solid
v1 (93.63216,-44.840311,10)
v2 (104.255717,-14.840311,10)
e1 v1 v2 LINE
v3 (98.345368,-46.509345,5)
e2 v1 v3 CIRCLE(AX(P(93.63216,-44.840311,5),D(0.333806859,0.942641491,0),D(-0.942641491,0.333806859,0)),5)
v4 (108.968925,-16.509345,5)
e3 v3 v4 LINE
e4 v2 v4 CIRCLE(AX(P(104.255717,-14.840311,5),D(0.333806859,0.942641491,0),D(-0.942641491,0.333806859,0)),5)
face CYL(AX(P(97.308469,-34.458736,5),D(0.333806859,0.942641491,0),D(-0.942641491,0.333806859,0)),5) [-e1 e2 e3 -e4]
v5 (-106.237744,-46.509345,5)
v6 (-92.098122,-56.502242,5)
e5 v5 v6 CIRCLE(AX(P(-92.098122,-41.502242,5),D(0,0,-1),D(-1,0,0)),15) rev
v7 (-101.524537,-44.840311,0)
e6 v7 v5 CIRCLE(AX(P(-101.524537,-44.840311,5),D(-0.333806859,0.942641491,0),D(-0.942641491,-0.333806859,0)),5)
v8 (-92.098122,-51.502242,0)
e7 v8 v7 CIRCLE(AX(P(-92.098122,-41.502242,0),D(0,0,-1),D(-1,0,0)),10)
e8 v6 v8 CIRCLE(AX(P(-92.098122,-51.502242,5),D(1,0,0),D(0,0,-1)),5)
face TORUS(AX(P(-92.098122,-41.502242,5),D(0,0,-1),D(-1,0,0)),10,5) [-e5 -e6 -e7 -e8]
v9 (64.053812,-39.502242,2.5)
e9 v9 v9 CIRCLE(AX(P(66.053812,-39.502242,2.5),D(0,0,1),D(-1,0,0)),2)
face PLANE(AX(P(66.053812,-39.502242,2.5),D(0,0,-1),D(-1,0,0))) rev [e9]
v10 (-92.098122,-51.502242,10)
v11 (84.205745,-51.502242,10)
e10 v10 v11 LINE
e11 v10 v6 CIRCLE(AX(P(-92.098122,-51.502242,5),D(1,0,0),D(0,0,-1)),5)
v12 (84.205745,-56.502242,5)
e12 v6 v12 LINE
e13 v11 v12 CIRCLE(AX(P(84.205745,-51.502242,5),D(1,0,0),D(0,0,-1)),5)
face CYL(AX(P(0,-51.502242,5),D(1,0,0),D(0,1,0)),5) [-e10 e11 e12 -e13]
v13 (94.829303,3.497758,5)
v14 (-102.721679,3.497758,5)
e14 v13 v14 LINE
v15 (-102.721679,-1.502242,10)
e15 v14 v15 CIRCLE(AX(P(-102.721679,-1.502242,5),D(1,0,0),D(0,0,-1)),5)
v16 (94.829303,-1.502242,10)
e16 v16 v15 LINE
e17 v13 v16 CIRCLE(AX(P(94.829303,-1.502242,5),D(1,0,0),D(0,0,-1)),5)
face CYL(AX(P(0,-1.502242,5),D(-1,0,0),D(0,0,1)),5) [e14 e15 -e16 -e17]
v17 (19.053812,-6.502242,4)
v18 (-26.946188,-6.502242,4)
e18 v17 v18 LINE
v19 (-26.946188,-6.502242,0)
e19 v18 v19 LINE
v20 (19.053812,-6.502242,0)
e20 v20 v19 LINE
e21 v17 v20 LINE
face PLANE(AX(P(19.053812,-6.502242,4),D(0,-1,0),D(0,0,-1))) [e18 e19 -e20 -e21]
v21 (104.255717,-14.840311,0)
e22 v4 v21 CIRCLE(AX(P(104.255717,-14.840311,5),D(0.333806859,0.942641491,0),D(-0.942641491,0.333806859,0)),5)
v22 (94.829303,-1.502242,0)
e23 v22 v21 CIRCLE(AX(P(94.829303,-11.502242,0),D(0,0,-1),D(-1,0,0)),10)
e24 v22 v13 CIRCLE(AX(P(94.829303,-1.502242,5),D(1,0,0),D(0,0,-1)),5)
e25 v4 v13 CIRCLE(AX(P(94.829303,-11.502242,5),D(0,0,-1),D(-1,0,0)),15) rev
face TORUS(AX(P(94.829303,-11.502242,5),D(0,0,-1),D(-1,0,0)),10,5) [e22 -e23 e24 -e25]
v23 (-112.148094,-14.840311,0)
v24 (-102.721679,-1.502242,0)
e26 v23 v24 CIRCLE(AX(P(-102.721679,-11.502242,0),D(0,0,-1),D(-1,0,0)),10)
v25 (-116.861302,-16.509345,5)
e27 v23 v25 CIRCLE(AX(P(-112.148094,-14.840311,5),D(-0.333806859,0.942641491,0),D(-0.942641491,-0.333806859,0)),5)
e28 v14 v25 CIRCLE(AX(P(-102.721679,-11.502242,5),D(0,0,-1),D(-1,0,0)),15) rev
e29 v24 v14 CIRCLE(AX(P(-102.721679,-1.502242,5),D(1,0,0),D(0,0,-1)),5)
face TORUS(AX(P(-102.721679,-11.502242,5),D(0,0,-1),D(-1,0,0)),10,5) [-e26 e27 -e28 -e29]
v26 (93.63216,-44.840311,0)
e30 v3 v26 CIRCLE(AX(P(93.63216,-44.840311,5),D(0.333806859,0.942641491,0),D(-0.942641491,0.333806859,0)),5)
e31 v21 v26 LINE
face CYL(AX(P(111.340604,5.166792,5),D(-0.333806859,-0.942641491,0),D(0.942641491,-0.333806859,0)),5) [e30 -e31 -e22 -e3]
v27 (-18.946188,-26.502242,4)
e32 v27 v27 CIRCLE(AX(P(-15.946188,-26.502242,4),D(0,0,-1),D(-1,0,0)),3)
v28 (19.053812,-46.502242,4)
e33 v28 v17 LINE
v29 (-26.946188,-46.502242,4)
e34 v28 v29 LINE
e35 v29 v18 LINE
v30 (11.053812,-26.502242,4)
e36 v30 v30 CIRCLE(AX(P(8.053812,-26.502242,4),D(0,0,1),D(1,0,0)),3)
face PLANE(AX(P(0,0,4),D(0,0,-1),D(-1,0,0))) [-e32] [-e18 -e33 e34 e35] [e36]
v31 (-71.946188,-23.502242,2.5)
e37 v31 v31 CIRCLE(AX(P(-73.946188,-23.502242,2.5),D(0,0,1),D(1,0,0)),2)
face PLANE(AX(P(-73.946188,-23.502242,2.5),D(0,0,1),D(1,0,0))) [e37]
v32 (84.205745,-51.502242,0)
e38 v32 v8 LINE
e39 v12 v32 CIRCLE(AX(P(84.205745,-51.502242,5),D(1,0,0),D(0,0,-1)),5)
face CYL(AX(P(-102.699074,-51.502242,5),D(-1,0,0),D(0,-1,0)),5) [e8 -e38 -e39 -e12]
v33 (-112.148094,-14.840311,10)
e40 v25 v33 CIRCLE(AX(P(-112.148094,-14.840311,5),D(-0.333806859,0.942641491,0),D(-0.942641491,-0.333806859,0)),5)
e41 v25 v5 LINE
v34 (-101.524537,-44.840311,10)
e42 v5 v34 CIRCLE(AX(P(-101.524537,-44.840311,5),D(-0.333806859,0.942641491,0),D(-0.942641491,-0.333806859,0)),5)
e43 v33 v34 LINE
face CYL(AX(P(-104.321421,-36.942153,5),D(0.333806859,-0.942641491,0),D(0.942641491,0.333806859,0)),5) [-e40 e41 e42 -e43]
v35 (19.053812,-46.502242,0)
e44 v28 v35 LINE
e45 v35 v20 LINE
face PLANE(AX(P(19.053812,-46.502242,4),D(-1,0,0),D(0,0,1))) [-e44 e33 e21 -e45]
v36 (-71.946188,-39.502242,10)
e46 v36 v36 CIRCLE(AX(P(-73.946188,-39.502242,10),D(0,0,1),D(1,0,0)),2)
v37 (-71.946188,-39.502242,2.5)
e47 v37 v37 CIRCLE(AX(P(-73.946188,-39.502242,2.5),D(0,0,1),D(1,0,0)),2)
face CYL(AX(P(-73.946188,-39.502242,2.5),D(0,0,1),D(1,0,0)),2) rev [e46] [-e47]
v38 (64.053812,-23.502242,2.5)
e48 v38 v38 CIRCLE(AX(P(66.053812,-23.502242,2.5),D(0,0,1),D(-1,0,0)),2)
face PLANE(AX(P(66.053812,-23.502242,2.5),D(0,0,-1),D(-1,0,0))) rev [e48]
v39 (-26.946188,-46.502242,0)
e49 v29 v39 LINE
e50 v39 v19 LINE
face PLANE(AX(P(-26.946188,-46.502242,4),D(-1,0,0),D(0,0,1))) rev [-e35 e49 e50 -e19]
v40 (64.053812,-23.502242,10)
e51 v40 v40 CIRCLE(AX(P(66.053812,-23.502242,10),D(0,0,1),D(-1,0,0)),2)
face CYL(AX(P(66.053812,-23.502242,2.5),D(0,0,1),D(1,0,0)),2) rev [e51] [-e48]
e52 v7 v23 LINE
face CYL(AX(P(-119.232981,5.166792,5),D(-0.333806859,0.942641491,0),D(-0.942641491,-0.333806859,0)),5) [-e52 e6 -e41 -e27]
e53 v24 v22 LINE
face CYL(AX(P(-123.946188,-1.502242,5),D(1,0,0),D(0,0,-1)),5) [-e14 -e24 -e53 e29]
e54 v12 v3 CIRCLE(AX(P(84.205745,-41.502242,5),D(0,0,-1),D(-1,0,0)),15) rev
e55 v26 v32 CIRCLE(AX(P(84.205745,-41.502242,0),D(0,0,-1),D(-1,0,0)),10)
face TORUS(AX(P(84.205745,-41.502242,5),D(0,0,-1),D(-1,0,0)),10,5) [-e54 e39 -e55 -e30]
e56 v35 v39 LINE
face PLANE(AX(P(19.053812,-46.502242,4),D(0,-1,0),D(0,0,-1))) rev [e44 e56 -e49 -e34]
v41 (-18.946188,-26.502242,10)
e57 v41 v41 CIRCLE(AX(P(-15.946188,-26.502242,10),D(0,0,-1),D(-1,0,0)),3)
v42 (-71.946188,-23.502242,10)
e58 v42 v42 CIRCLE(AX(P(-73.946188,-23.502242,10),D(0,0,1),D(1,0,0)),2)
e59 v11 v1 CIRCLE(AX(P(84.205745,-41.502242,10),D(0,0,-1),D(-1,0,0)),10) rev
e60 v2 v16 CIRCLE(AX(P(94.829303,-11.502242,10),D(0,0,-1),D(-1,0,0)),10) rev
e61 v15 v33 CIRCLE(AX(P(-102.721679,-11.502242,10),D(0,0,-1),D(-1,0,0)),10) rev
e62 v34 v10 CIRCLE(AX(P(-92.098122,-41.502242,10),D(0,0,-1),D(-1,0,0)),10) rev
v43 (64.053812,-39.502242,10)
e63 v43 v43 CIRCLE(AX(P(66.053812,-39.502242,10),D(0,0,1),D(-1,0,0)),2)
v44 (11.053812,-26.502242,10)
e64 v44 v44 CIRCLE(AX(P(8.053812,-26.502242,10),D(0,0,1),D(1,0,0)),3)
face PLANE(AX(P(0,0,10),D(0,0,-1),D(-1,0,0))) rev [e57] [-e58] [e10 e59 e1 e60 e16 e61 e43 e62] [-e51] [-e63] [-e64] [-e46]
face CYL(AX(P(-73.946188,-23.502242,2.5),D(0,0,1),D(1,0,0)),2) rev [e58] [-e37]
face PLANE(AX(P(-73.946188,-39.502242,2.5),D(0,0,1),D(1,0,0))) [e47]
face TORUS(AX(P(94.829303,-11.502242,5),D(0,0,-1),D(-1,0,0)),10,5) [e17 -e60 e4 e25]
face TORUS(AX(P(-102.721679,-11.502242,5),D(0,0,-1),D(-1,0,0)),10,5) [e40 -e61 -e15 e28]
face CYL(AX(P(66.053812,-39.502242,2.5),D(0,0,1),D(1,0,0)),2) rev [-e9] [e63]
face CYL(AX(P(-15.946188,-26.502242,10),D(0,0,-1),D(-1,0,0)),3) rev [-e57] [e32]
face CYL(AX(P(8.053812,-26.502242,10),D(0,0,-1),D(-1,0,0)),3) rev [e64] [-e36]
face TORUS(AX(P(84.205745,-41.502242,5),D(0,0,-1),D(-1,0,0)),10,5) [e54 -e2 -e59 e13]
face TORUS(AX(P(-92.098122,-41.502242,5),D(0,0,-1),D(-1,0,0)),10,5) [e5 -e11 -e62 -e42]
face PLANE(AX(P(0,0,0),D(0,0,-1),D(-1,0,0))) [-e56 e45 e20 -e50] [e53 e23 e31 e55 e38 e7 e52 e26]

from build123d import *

# Parameters (mm, degrees)
EXTRUDE_1_DEPTH     = 10
FILLET_1_R          = 15
FILLET_2_R          = 5
SKETCH_2_R          = 2
CUT_EXTRUDE_1_DEPTH = 7.5
SKETCH_3_W          = 46
SKETCH_3_H          = 40
CUT_EXTRUDE_2_DEPTH = 4
SKETCH_8_R          = 3
CUT_EXTRUDE_3_DEPTH = 131.716858695


with BuildPart() as part:
    # 草圖1 → 填料-伸長1 (new body)
    with BuildSketch(Plane.XY):
        Polygon((-123.946188341, 3.497757848), (-102.699073989, -56.502242152), (94.806697307, -56.502242152), (116.053811659, 3.497757848), align=None)
    extrude(amount=EXTRUDE_1_DEPTH)

    # 圓角1
    fillet_1_edges = [part.edges().sort_by_distance(p)[0] for p in [
        (116.053811659, 3.497757848, 5),
        (94.806697307, -56.502242152, 5),
        (-102.699073989, -56.502242152, 5),
        (-123.946188341, 3.497757848, 5),
    ]]
    fillet(fillet_1_edges, radius=FILLET_1_R)

    # 圓角2
    fillet_2_edges = [part.edges().sort_by_distance(p)[0] for p in [
        (107.078925905, -2.845064302, 10),
        (103.657146356, -31.509345041, 10),
        (92.862923252, -53.75186548, 10),
        (-3.946188341, -56.502242152, 10),
        (-100.755299934, -53.75186548, 10),
        (-111.549523037, -31.509345041, 10),
        (-114.971302586, -2.845064302, 10),
        (-3.946188341, 3.497757848, 10),
        (-114.971302586, -2.845064302, 0),
        (-111.549523037, -31.509345041, 0),
        (-100.755299934, -53.75186548, 0),
        (-3.946188341, -56.502242152, 0),
        (92.862923252, -53.75186548, 0),
        (103.657146356, -31.509345041, 0),
        (107.078925905, -2.845064302, 0),
        (-3.946188341, 3.497757848, 0),
    ]]
    fillet(fillet_2_edges, radius=FILLET_2_R - 0.0001)  # a hair under: the kernel refuses the full size

    # 草圖2 → 除料-伸長1 (cut)
    with BuildSketch(Plane.XY.offset(10)):
        with Locations((-73.946188341, -23.502242152)):
            Circle(SKETCH_2_R)
        with Locations((-73.946188341, -39.502242152)):
            Circle(SKETCH_2_R)
        with Locations(Location((66.053811659, -39.502242152, 0), (0, 0, 180))):
            Circle(SKETCH_2_R)
        with Locations(Location((66.053811659, -23.502242152, 0), (0, 0, 180))):
            Circle(SKETCH_2_R)
    extrude(amount=-CUT_EXTRUDE_1_DEPTH, mode=Mode.SUBTRACT)

    # 草圖3 → 除料-伸長2 (cut)
    with BuildSketch(Plane(origin=(0, 0, 0), x_dir=(-1, 0, 0), z_dir=(0, 0, -1))):
        with Locations((3.946188341, -26.502242152)):
            Rectangle(SKETCH_3_W, SKETCH_3_H)
    extrude(amount=-CUT_EXTRUDE_2_DEPTH, mode=Mode.SUBTRACT)

    # 草圖8 → 除料-伸長3 (cut, through all)
    with BuildSketch(Plane(origin=(0, 0, 4), x_dir=(-1, 0, 0), z_dir=(0, 0, -1))):
        with Locations((15.946188341, -26.502242152)):
            Circle(SKETCH_8_R)
        with Locations(Location((-8.053811659, -26.502242152, 0), (0, 0, 180))):
            Circle(SKETCH_8_R)
    extrude(amount=-CUT_EXTRUDE_3_DEPTH, mode=Mode.SUBTRACT)


solid = part.part
